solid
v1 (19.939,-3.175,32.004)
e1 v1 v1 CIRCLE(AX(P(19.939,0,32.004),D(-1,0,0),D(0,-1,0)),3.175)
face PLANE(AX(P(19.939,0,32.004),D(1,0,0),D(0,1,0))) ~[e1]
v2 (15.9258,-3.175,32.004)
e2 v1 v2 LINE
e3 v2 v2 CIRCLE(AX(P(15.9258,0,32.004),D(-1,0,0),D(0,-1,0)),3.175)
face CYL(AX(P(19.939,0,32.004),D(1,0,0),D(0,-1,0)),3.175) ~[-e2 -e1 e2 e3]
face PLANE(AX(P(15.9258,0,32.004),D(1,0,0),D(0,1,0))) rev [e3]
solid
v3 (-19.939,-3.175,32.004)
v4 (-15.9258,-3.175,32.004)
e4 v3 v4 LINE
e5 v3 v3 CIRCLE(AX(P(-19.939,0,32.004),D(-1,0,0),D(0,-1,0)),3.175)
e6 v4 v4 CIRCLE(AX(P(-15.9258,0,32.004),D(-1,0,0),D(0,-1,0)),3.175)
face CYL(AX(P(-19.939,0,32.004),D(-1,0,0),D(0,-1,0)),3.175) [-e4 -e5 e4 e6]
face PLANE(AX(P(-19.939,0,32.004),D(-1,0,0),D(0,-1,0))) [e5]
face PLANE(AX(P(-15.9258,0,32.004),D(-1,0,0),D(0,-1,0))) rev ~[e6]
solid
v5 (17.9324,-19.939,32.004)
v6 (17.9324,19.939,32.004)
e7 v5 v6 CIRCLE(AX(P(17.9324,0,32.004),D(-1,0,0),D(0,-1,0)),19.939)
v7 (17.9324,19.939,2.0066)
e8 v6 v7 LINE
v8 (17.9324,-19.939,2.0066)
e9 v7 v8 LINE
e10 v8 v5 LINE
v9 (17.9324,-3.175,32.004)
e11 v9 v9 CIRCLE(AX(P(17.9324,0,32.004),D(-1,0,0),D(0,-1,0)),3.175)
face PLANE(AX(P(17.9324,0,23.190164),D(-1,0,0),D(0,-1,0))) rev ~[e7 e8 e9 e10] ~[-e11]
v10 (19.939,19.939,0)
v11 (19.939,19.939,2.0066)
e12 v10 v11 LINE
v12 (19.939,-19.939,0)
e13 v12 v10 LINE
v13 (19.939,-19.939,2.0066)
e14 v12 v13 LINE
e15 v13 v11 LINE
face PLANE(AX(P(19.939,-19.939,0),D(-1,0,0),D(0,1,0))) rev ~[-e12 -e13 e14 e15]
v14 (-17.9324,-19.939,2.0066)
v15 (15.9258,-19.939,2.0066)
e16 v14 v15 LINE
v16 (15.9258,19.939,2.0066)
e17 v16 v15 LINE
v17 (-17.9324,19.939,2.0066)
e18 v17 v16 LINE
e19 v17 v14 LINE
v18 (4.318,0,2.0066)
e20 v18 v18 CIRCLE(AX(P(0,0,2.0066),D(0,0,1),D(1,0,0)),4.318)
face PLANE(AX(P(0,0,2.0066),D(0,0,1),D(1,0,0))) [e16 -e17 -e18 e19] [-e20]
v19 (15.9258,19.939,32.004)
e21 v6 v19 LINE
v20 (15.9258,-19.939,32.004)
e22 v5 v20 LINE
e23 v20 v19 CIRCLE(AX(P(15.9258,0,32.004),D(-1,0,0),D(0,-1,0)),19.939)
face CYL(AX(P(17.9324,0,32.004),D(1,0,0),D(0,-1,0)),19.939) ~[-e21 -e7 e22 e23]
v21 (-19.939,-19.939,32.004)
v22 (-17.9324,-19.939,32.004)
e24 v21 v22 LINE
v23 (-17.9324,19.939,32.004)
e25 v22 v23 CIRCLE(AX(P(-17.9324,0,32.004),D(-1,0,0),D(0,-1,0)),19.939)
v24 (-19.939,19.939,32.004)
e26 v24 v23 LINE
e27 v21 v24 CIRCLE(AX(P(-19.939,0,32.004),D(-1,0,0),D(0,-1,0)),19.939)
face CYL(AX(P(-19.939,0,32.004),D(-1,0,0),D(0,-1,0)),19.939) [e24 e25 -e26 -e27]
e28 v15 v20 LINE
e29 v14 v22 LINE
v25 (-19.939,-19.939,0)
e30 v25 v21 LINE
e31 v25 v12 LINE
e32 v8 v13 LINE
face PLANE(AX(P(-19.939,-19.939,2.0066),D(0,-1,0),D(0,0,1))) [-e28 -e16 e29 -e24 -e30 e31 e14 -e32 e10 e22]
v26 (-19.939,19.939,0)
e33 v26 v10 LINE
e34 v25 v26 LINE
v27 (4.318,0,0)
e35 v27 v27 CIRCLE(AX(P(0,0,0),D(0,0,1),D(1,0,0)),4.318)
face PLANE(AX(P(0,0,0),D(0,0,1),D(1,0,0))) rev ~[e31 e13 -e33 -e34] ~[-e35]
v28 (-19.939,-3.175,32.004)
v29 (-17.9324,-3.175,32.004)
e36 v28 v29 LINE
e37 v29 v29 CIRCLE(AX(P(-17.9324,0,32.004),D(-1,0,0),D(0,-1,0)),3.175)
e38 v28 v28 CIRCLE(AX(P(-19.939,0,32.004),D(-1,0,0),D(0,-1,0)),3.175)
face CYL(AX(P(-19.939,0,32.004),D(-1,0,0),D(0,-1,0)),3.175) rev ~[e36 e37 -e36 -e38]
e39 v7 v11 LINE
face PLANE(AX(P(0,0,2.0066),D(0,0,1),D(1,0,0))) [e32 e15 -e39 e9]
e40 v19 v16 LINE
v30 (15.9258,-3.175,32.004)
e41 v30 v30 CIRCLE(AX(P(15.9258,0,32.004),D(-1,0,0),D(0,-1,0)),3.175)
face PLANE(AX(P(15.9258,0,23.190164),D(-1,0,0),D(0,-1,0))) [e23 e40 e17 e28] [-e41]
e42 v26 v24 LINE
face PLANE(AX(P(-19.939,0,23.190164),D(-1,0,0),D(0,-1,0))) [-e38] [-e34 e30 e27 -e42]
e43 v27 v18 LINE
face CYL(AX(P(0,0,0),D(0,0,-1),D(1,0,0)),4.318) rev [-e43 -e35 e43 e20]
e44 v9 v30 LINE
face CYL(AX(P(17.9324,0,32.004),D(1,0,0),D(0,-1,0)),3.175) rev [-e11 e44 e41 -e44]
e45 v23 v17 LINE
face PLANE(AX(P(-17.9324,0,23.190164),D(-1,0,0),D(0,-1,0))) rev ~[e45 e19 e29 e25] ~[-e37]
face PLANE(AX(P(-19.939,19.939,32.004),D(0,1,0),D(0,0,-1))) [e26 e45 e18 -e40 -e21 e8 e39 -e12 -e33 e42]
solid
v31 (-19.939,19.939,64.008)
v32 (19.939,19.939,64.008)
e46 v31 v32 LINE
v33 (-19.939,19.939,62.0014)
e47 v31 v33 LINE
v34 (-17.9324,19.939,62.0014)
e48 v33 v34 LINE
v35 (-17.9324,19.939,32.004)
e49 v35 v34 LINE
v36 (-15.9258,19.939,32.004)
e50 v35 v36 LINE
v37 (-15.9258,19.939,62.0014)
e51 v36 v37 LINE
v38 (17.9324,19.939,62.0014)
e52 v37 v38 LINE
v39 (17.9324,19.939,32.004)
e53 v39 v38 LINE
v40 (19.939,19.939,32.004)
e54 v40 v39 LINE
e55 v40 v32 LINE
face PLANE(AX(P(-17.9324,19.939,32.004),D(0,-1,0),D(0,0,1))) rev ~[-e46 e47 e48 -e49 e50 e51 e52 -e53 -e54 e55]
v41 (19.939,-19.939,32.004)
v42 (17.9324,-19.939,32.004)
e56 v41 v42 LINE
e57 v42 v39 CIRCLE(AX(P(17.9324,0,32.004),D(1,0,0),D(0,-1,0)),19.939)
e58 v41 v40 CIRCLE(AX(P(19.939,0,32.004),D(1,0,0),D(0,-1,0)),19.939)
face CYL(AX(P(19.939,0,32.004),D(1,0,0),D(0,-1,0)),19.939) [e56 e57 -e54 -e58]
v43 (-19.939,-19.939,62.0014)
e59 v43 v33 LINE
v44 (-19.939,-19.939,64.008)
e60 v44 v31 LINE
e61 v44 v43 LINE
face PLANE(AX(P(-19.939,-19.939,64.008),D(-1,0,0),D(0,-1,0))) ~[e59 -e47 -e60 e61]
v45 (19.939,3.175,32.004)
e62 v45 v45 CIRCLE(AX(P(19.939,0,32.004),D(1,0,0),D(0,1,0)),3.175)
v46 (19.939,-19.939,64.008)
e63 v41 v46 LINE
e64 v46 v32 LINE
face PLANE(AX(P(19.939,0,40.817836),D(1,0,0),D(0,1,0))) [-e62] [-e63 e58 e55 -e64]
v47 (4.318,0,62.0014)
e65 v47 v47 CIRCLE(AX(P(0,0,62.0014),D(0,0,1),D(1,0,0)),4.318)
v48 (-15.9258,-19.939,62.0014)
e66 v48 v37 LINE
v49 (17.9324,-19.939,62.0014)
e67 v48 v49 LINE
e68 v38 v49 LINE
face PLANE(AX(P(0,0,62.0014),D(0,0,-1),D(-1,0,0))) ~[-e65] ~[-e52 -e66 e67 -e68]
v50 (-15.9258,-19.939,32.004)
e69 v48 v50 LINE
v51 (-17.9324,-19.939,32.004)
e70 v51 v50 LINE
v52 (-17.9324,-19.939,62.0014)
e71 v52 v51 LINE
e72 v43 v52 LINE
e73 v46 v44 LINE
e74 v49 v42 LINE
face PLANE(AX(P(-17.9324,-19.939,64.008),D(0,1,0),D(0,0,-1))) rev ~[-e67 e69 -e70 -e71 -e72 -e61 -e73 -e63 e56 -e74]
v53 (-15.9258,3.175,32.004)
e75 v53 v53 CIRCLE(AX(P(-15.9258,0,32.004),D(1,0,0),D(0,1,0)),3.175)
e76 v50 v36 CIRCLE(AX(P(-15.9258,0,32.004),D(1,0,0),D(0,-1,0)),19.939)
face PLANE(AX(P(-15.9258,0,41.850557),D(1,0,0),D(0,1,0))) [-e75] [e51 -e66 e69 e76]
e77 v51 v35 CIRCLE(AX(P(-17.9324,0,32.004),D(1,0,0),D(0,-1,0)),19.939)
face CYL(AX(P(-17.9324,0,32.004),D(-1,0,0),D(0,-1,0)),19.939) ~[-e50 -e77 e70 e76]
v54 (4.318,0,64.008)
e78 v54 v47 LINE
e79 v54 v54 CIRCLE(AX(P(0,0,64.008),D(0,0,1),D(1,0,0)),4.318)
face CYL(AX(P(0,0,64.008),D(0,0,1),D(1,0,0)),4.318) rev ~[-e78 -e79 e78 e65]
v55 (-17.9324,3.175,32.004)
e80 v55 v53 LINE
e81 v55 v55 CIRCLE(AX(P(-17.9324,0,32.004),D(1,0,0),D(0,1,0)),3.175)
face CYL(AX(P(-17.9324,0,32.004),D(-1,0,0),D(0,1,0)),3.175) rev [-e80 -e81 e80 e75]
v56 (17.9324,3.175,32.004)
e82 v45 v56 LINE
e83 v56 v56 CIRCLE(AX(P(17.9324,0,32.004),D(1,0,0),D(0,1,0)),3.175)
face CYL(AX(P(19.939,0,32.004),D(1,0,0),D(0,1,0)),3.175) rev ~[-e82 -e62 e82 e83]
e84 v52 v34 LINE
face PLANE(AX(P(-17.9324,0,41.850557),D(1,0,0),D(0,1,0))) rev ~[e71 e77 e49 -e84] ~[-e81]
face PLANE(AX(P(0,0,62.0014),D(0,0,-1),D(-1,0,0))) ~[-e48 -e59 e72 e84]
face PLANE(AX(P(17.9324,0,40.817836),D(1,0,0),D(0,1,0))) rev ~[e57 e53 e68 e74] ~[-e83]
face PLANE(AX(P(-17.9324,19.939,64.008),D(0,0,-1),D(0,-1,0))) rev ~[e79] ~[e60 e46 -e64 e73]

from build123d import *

# Parameters (mm, degrees)
F0_W      = 39.878
F0_H      = 39.878
F0_R      = 4.318
F1_DEPTH  = 2.0066
F5_R      = 3.175
F6_DEPTH  = 2.0066
F7_R      = 3.175
F8_DEPTH  = 2.0066
F9_R      = 3.175
F10_DEPTH = 2.0066
F11_R     = 3.175
F12_DEPTH = 2.0066
F13_R     = 3.175
F14_DEPTH = 4.0132


with BuildPart() as f1:
    # F0 (on Top) → F1 (new body)
    with BuildSketch(Plane.XY):
        Rectangle(F0_W, F0_H)
        Circle(F0_R, mode=Mode.SUBTRACT)
    extrude(amount=F1_DEPTH)


with BuildPart() as f4_1:
    # F4: instance of F1
    add(f1.part.mirror(Plane.XY.offset(32.004)))

    # F5 (on face) → F6 (join)
    with BuildSketch(Plane.YZ.offset(19.939)):
        with BuildLine():
            Line((-19.939, 62.0014), (-19.939, 32.004))
            ThreePointArc((-19.939, 32.004), (0, 12.065), (19.939, 32.004))
            Line((19.939, 32.004), (19.939, 62.0014))
            Line((19.939, 62.0014), (-19.939, 62.0014))
        make_face()
        with Locations((0, 32.004)):
            Circle(F5_R, mode=Mode.SUBTRACT)
    extrude(amount=-F6_DEPTH)

    # F11 (on face) → F12 (join)
    with BuildSketch(Plane.YZ.offset(-17.9324)):
        with BuildLine():
            Line((19.939, 32.004), (19.939, 64.008))
            Line((19.939, 64.008), (-19.939, 64.008))
            Line((-19.939, 64.008), (-19.939, 32.004))
            ThreePointArc((-19.939, 32.004), (0, 12.065), (19.939, 32.004))
        make_face()
        with Locations((0, 32.004)):
            Circle(F11_R, mode=Mode.SUBTRACT)
    extrude(amount=F12_DEPTH)


with BuildPart() as f1_1:
    add(f1.part)

    # F7 (on face) → F8 (join)
    with BuildSketch(Plane(origin=(17.9324, 0, 0), x_dir=(0, -1, 0), z_dir=(-1, 0, 0))):
        with BuildLine():
            Line((-19.939, 32.004), (-19.939, 2.0066))
            Line((-19.939, 2.0066), (19.939, 2.0066))
            Line((19.939, 2.0066), (19.939, 32.004))
            ThreePointArc((19.939, 32.004), (0, 51.943), (-19.939, 32.004))
        make_face()
        with Locations((0, 32.004)):
            Circle(F7_R, mode=Mode.SUBTRACT)
    extrude(amount=F8_DEPTH)

    # F9 (on face) → F10 (join)
    with BuildSketch(Plane(origin=(-19.939, 0, 0), x_dir=(0, -1, 0), z_dir=(-1, 0, 0))):
        with BuildLine():
            Line((-19.939, 2.0066), (19.939, 2.0066))
            Line((19.939, 2.0066), (19.939, 32.004))
            ThreePointArc((19.939, 32.004), (0, 51.943), (-19.939, 32.004))
            Line((-19.939, 32.004), (-19.939, 2.0066))
        make_face()
        with Locations((0, 32.004)):
            Circle(F9_R, mode=Mode.SUBTRACT)
    extrude(amount=-F10_DEPTH)


with BuildPart() as f14:
    # F13 (on face) → F14 (new body, through all)
    with BuildSketch(Plane(origin=(-19.939, 0, 0), x_dir=(0, -1, 0), z_dir=(-1, 0, 0))):
        with Locations((0, 32.004)):
            Circle(F13_R)
    extrude(amount=-F14_DEPTH)


with BuildPart() as f15_1:
    # F15: instance of F14
    add(f14.part.mirror(Plane.YZ))


solid = Compound([f4_1.part, f1_1.part, f14.part, f15_1.part])
